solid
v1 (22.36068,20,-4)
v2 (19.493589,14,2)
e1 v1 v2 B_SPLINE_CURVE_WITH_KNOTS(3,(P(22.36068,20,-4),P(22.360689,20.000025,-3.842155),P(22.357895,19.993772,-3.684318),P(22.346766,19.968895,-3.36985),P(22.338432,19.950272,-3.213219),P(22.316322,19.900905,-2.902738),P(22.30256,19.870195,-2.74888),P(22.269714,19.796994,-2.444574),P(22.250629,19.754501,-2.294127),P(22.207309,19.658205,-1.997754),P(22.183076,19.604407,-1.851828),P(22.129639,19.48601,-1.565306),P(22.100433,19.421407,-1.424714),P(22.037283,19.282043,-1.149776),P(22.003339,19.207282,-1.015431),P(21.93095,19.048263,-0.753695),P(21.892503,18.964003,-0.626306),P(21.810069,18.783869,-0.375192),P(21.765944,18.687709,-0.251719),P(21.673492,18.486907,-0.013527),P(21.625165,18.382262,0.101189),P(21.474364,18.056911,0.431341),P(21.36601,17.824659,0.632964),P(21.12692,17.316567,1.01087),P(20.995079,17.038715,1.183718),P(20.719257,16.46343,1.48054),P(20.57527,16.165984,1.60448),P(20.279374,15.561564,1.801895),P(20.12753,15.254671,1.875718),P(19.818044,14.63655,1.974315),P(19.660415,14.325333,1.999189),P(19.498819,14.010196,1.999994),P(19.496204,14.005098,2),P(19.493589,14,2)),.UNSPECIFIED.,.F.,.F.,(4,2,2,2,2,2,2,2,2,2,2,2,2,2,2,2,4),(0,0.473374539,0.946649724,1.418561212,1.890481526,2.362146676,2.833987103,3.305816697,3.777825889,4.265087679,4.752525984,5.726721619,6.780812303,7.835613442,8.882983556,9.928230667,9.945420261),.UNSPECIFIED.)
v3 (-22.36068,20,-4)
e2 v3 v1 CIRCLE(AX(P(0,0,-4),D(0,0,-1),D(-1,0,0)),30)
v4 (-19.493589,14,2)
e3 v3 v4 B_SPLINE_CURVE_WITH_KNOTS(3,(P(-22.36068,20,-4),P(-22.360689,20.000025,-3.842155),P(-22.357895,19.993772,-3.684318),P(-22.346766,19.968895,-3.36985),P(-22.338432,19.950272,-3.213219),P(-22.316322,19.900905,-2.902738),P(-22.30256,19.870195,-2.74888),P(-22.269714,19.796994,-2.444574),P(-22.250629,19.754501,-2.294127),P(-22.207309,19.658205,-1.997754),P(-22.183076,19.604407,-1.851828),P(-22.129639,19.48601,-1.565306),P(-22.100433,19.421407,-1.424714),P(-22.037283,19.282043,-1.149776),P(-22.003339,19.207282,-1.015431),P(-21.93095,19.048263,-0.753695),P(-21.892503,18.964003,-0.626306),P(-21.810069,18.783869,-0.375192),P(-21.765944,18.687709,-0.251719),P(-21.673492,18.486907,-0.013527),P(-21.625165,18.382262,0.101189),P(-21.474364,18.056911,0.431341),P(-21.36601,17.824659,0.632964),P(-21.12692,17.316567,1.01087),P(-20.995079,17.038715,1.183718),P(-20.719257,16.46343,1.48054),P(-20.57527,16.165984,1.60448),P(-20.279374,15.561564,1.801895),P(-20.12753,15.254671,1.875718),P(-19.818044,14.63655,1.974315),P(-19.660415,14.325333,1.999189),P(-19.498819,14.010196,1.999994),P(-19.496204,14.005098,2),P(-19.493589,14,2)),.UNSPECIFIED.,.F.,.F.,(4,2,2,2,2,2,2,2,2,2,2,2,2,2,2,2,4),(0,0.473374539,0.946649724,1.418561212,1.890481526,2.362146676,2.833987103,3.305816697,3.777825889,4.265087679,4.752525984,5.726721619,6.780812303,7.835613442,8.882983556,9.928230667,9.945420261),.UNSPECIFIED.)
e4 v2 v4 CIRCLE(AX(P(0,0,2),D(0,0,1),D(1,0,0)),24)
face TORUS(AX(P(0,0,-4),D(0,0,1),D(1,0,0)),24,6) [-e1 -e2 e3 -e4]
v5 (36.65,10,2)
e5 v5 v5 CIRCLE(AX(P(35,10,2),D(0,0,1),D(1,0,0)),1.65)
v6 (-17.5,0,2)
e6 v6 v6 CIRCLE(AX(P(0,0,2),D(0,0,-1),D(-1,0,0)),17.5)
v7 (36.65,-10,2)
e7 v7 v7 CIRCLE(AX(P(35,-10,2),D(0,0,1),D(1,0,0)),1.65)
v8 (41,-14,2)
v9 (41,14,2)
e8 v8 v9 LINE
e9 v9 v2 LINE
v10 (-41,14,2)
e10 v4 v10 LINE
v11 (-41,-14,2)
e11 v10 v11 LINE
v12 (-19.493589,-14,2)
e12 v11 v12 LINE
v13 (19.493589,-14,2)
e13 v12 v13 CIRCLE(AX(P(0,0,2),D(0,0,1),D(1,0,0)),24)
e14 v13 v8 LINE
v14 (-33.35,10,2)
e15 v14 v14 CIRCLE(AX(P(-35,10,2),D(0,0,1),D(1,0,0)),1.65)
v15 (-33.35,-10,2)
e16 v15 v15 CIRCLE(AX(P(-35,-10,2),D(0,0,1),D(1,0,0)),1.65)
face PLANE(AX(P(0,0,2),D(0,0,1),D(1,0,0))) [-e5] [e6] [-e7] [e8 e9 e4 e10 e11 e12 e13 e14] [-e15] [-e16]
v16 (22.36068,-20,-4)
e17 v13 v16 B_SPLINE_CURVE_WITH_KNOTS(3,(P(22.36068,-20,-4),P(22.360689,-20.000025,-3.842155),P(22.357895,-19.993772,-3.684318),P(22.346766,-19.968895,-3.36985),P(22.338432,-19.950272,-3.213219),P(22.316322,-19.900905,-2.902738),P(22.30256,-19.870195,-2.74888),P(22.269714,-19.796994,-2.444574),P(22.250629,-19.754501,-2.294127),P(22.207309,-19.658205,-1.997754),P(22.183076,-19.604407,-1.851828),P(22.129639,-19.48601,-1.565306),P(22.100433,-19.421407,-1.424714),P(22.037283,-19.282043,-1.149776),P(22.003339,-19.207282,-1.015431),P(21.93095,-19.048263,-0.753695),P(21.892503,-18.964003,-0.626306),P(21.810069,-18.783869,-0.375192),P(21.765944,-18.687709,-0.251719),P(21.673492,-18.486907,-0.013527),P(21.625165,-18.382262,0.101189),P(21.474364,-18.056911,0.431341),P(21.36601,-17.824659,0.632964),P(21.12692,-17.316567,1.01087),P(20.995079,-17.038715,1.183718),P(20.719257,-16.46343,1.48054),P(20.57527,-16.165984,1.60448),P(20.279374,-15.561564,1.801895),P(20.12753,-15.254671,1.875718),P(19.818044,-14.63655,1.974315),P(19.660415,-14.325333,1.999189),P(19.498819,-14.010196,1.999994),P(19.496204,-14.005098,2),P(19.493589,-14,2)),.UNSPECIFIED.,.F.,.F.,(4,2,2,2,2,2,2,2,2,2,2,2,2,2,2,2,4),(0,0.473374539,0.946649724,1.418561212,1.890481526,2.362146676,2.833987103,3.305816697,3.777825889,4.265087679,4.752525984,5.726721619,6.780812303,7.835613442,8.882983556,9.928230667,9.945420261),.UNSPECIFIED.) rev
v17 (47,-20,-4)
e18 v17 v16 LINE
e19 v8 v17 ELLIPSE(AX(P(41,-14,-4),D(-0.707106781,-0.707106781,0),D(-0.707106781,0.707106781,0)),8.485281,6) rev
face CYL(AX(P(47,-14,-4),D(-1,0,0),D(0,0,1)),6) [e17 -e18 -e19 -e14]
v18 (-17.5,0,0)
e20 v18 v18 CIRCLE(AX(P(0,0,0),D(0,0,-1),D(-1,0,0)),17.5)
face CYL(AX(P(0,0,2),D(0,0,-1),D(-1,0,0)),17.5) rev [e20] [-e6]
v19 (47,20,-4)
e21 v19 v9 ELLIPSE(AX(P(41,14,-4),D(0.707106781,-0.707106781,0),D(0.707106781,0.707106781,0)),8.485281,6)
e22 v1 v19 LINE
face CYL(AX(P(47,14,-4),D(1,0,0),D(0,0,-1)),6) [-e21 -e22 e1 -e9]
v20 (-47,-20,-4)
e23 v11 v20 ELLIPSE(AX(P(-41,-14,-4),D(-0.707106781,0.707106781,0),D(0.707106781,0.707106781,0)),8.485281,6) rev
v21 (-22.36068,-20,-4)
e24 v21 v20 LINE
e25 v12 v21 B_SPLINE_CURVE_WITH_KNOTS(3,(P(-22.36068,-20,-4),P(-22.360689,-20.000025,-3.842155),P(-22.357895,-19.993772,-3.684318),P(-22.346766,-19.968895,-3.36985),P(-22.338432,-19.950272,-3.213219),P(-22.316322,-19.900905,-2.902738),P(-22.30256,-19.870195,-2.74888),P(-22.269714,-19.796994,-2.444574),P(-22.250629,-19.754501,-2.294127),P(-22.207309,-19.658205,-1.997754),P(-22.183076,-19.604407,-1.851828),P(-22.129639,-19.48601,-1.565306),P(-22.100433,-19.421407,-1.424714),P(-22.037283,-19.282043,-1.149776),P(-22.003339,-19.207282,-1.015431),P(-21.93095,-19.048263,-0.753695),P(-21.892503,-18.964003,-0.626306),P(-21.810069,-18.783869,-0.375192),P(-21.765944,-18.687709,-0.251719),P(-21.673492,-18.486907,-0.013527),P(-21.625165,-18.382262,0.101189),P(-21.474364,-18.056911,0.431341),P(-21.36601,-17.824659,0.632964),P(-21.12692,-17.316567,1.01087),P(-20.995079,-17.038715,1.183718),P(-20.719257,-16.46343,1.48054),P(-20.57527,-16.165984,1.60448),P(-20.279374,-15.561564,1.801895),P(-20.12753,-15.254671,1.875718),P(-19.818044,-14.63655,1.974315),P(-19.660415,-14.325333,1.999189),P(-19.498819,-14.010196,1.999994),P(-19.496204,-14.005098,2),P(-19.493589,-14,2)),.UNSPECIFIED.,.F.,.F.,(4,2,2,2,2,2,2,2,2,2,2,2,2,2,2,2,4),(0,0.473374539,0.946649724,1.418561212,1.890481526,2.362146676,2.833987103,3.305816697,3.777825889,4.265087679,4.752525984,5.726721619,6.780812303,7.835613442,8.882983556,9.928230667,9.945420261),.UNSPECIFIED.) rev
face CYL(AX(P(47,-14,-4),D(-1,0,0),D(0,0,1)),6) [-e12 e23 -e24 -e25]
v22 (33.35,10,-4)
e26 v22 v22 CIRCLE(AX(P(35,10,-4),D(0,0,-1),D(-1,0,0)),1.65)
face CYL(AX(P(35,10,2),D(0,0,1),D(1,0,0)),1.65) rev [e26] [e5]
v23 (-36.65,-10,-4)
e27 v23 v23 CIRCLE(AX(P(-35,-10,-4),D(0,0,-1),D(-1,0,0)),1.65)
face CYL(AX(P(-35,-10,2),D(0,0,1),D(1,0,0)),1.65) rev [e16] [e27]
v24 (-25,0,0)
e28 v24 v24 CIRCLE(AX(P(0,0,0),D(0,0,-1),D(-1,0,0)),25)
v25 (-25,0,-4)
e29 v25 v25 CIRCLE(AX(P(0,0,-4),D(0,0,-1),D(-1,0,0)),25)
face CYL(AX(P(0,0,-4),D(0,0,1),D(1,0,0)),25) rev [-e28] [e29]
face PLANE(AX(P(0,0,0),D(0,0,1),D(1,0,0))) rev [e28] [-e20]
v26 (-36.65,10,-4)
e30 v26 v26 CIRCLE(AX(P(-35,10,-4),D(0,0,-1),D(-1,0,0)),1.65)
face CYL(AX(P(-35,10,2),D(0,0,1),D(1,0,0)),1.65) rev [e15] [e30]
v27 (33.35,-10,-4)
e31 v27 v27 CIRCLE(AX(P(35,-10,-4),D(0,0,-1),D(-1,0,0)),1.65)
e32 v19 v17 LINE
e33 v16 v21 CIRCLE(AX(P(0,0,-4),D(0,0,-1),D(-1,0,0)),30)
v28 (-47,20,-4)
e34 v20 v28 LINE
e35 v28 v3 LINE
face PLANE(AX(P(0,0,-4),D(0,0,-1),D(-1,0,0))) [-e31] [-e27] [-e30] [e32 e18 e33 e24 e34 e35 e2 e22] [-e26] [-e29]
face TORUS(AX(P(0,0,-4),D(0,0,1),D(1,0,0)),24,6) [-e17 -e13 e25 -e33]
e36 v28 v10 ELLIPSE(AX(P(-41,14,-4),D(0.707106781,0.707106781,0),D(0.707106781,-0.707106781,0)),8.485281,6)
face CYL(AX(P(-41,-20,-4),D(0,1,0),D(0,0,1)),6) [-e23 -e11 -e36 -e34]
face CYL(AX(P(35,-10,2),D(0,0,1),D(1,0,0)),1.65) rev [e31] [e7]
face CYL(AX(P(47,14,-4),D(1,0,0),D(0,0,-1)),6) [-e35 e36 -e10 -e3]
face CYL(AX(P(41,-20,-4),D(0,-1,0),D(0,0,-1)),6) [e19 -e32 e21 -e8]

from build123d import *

# Parameters (mm, degrees)
SKETCH1_R             = 30
BOSS_EXTRUDE1_DEPTH   = 2
BOSS_EXTRUDE2_START   = 4
SKETCH2_R             = 30
SKETCH2_R_2           = 25
BOSS_EXTRUDE2_DEPTH   = 4
BOSS_EXTRUDE3_REACH   = 44.849
SKETCH3_W             = 94
SKETCH3_H             = 40
SKETCH4_R             = 25
CUT_EXTRUDE1_DEPTH    = 4
SKETCH5_R             = 17.5
CUT_EXTRUDE2_DEPTH    = 56.901699437
FILLET1_R             = 6
M4X0_7_TAPPED_HOLE1_D = 3.3


with BuildPart() as part:
    # Sketch1 → Boss-Extrude1 (new body)
    with BuildSketch(Plane.XY):
        Circle(SKETCH1_R)
    extrude(amount=BOSS_EXTRUDE1_DEPTH)

    # Sketch2 → Boss-Extrude2 (add)
    with BuildSketch(Plane(origin=(0, 0, 0), x_dir=(-1, 0, 0), z_dir=(0, 0, -1)).offset(BOSS_EXTRUDE2_START)):
        Circle(SKETCH2_R)
        Circle(SKETCH2_R_2, mode=Mode.SUBTRACT)
    extrude(amount=-BOSS_EXTRUDE2_DEPTH)

    # Boss-Extrude3: up to this face of the body (flat: up to its plane)
    boss_extrude3_end = Plane(part.part.faces().sort_by_distance((0, 0, 2))[0])
    # Sketch3 → Boss-Extrude3 (add, up to the picked face)
    with BuildSketch(Plane(origin=(0, 0, -4), x_dir=(-1, 0, 0), z_dir=(0, 0, -1)), mode=Mode.PRIVATE) as boss_extrude3_sk1:
        Rectangle(SKETCH3_W, SKETCH3_H)
    boss_extrude3_tool1 = split(extrude(boss_extrude3_sk1.sketch, amount=-BOSS_EXTRUDE3_REACH, mode=Mode.PRIVATE), bisect_by=boss_extrude3_end, keep=Keep.BOTH, mode=Mode.PRIVATE)
    add(boss_extrude3_tool1.solids().sort_by(Axis((0, 0, -4), (0, 0, 1)))[0])

    # Sketch4 → Cut-Extrude1 (cut)
    with BuildSketch(Plane(origin=(0, 0, -4), x_dir=(-1, 0, 0), z_dir=(0, 0, -1))):
        Circle(SKETCH4_R)
    extrude(amount=-CUT_EXTRUDE1_DEPTH, mode=Mode.SUBTRACT)

    # Sketch5 → Cut-Extrude2 (cut, through all)
    with BuildSketch(Plane(origin=(0, 0, 0), x_dir=(-1, 0, 0), z_dir=(0, 0, -1))):
        Circle(SKETCH5_R)
    extrude(amount=-CUT_EXTRUDE2_DEPTH, mode=Mode.SUBTRACT)

    # Fillet1
    fillet1_edges = [part.edges().sort_by_distance(p)[0] for p in [
        (47, 0, 2),
        (34.680339887, -20, 2),
        (34.680339887, 20, 2),
        (0, 30, 2),
        (0, -30, 2),
        (-34.680339887, -20, 2),
        (-47, 0, 2),
        (-34.680339887, 20, 2),
    ]]
    fillet(fillet1_edges, radius=FILLET1_R - 0.0001)  # a hair under: the kernel refuses the full size

    # M4x0.7 Tapped Hole1 (through all)
    with Locations(Plane.XY.offset(2)):
        with Locations((-35, 10), (-35, -10), (35, 10), (35, -10)):
            Hole(M4X0_7_TAPPED_HOLE1_D / 2)


solid = part.part
